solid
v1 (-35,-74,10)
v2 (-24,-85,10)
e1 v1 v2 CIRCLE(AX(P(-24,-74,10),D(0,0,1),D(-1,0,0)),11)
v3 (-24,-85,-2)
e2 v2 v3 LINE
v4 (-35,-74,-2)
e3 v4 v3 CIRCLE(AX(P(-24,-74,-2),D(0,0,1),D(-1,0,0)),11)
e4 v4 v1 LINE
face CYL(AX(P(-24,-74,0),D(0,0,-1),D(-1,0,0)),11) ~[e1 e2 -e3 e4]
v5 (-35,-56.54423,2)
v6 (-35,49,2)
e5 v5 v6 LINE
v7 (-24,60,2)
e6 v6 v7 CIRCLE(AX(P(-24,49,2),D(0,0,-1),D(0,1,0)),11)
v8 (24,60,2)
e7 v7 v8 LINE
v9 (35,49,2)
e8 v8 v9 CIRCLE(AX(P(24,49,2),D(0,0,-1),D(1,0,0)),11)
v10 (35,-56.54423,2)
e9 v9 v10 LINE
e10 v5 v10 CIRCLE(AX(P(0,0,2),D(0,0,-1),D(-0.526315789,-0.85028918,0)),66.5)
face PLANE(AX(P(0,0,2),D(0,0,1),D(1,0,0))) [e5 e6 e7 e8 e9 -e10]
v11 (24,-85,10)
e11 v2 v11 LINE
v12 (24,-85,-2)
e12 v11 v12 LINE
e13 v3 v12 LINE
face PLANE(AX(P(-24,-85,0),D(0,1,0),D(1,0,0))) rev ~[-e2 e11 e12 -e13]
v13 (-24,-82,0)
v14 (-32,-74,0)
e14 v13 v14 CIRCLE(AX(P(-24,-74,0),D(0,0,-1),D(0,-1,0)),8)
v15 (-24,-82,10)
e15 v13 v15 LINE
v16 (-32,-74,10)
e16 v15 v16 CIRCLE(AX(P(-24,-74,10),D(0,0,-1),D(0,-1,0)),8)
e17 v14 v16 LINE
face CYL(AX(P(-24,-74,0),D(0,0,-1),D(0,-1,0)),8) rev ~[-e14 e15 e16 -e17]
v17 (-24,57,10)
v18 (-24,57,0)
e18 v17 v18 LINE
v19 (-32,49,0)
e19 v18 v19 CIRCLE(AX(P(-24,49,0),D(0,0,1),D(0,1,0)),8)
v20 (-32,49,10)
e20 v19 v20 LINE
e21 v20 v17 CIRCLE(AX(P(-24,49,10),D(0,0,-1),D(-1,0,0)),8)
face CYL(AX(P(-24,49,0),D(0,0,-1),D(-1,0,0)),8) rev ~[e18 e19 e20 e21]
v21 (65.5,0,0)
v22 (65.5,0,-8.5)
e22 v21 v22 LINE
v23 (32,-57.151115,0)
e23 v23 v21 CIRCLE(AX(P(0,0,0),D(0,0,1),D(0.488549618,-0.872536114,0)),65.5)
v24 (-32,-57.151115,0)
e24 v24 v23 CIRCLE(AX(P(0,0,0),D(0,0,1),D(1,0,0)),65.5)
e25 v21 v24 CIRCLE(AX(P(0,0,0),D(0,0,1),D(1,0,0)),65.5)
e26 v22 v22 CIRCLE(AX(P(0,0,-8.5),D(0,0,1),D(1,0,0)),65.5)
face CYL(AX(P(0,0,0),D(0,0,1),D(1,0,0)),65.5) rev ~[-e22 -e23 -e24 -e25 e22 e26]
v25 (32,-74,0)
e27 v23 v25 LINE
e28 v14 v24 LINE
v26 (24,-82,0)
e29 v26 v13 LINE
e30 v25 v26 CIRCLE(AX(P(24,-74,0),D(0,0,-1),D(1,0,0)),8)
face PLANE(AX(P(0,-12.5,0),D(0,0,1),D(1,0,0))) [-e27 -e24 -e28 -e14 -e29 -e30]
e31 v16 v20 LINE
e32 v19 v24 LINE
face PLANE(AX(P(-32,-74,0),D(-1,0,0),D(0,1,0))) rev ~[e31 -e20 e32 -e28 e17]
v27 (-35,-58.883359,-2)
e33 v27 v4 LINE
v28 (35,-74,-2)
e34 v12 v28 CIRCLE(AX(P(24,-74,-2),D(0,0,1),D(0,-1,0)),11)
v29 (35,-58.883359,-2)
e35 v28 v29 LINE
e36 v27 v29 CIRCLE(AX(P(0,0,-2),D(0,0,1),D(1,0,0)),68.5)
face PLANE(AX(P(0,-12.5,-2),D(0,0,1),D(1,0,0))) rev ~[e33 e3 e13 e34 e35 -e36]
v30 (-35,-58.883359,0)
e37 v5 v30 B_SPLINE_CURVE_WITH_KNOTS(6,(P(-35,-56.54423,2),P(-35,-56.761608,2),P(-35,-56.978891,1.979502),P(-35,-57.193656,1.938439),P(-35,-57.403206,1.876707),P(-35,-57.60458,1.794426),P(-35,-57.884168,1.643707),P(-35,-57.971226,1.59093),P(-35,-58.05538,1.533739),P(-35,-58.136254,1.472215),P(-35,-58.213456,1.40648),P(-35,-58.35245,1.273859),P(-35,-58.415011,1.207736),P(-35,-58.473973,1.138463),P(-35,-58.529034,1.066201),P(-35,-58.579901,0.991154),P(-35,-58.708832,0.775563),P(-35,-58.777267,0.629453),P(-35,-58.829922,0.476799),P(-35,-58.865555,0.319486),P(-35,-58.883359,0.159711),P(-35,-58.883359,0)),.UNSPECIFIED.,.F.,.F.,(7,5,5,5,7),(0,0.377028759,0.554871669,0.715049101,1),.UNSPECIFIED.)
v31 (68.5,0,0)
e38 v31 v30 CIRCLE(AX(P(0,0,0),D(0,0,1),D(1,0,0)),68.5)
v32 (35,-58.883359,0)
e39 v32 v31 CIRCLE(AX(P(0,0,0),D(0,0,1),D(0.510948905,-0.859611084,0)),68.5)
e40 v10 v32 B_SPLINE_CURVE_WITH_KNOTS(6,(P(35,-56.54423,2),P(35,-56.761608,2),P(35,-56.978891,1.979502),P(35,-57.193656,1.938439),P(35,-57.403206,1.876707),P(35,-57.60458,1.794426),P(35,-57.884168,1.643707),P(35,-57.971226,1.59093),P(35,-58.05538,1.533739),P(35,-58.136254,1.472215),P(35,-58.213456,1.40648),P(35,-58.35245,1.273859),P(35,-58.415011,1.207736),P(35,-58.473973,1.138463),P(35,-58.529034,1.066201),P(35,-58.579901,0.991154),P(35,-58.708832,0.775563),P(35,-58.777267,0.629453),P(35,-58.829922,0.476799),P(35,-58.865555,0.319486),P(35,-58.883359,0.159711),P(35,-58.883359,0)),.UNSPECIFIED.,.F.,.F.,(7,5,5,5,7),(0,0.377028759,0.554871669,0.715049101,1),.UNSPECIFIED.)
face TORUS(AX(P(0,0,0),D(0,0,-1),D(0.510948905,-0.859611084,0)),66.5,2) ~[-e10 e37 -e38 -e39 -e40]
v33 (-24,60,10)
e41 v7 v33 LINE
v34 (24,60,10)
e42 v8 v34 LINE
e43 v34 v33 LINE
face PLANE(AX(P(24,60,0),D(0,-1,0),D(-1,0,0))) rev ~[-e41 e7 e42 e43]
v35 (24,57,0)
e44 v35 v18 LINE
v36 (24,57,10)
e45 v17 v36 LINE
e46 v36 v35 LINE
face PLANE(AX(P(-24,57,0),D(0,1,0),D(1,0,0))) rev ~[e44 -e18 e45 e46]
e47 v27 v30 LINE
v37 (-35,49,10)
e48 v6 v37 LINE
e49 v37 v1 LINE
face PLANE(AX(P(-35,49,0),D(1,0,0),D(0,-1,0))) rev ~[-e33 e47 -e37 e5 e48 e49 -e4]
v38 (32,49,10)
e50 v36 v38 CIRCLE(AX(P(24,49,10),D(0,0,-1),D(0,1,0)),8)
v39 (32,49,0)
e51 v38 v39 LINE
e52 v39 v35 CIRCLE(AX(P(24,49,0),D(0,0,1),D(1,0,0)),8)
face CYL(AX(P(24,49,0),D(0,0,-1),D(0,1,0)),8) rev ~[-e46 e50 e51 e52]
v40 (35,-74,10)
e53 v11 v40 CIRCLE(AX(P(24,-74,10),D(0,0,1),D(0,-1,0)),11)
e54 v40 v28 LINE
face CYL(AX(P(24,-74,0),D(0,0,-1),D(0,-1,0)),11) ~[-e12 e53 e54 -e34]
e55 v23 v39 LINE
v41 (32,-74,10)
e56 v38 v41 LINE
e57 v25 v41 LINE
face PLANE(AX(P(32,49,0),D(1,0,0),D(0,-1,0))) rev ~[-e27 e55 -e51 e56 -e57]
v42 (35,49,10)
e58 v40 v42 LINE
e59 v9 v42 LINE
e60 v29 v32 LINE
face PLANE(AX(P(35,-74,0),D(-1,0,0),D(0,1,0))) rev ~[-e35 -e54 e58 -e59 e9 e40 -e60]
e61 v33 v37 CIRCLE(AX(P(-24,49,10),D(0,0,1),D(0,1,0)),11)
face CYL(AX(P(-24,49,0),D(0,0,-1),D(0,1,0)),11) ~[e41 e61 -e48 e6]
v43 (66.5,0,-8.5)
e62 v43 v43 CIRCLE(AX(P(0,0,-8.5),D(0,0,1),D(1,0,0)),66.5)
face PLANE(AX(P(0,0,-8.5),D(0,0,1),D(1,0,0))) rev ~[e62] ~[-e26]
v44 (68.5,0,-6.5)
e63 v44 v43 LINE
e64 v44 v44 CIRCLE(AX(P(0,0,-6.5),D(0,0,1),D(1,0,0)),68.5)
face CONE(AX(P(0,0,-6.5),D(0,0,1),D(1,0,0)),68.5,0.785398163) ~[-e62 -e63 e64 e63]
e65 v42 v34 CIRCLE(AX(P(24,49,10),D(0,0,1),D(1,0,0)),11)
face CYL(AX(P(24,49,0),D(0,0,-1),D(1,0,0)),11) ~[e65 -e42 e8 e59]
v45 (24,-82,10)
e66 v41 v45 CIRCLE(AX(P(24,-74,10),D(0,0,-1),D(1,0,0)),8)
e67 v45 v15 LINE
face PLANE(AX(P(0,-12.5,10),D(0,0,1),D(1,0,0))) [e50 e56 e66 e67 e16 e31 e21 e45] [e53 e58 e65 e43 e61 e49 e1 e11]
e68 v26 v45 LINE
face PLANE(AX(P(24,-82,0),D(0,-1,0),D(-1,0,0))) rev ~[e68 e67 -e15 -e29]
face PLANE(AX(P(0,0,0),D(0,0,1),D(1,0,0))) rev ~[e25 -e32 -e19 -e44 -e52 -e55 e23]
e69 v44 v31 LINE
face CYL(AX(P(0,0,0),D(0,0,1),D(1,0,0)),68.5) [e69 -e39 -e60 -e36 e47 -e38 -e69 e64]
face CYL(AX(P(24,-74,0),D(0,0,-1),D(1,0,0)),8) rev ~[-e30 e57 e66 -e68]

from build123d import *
from build123d import SkipClean  # not in build123d's __all__

# Parameters (mm, degrees)
F0_R     = 68.5
F0_R_2   = 65.5
F1_DEPTH = 2
F2_DEPTH = 8.5
F3_SIZE  = 2
F5_DEPTH = 2
F6_DEPTH = 3
F7_DEPTH = 10
F8_DEPTH = 25
F9_R     = 2


# Not quite as in the source:
# - after a boolean that leaves OpenCascade's solid faulty, fix() repairs it


with BuildPart() as f1:
    # F0 (on Top) → F1 (new body)
    with BuildSketch(Plane.XY):
        Circle(F0_R)
        Circle(F0_R_2, mode=Mode.SUBTRACT)
        Circle(F0_R_2)
    extrude(amount=F1_DEPTH)

    # F0 (on Top) → F2 (join)
    with BuildSketch(Plane.XY):
        Circle(F0_R)
        Circle(F0_R_2, mode=Mode.SUBTRACT)
    extrude(amount=-F2_DEPTH)

    # F3
    f3_edges = [f1.edges().sort_by_distance(p)[0] for p in [
        (-68.5, 0, -8.5),
    ]]
    chamfer(f3_edges, length=F3_SIZE)

    # F4 (on Top) → F5 (join)
    with BuildSketch(Plane.XY):
        with BuildLine():
            Line((35, -74), (35, 49))
            ThreePointArc((35, 49), (31.7781745931, 56.7781745931), (24, 60))
            Line((24, 60), (-24, 60))
            ThreePointArc((-24, 60), (-31.7781745931, 56.7781745931), (-35, 49))
            Line((-35, 49), (-35, -74))
            ThreePointArc((-35, -74), (-31.7781745931, -81.7781745931), (-24, -85))
            Line((-24, -85), (24, -85))
            ThreePointArc((24, -85), (31.7781745931, -81.7781745931), (35, -74))
        make_face()
        with BuildLine():
            ThreePointArc((-32, 49), (-29.6568542495, 54.6568542495), (-24, 57))
            Line((-24, 57), (0, 57))
            Line((0, 57), (24, 57))
            ThreePointArc((24, 57), (29.6568542495, 54.6568542495), (32, 49))
            Line((32, 49), (32, -74))
            ThreePointArc((32, -74), (29.6568542495, -79.6568542495), (24, -82))
            Line((24, -82), (-24, -82))
            ThreePointArc((-24, -82), (-29.6568542495, -79.6568542495), (-32, -74))
            Line((-32, -74), (-32, 49))
        make_face(mode=Mode.SUBTRACT)
        with BuildLine():
            Line((0, 57), (-24, 57))
            ThreePointArc((-24, 57), (-29.6568542495, 54.6568542495), (-32, 49))
            Line((-32, 49), (-32, -74))
            ThreePointArc((-32, -74), (-29.6568542495, -79.6568542495), (-24, -82))
            Line((-24, -82), (24, -82))
            ThreePointArc((24, -82), (29.6568542495, -79.6568542495), (32, -74))
            Line((32, -74), (32, 49))
            ThreePointArc((32, 49), (29.6568542495, 54.6568542495), (24, 57))
            Line((24, 57), (0, 57))
        make_face()
    extrude(amount=-F5_DEPTH)

    # F4 (on Top) → F6 (cut)
    with BuildSketch(Plane.XY):
        with BuildLine():
            Line((0, 57), (-24, 57))
            ThreePointArc((-24, 57), (-29.6568542495, 54.6568542495), (-32, 49))
            Line((-32, 49), (-32, -74))
            ThreePointArc((-32, -74), (-29.6568542495, -79.6568542495), (-24, -82))
            Line((-24, -82), (24, -82))
            ThreePointArc((24, -82), (29.6568542495, -79.6568542495), (32, -74))
            Line((32, -74), (32, 49))
            ThreePointArc((32, 49), (29.6568542495, 54.6568542495), (24, 57))
            Line((24, 57), (0, 57))
        make_face()
    extrude(amount=F6_DEPTH, mode=Mode.SUBTRACT)

    # F4 (on Top) → F7 (join)
    with BuildSketch(Plane.XY):
        with BuildLine():
            Line((35, -74), (35, 49))
            ThreePointArc((35, 49), (31.7781745931, 56.7781745931), (24, 60))
            Line((24, 60), (-24, 60))
            ThreePointArc((-24, 60), (-31.7781745931, 56.7781745931), (-35, 49))
            Line((-35, 49), (-35, -74))
            ThreePointArc((-35, -74), (-31.7781745931, -81.7781745931), (-24, -85))
            Line((-24, -85), (24, -85))
            ThreePointArc((24, -85), (31.7781745931, -81.7781745931), (35, -74))
        make_face()
        with BuildLine():
            ThreePointArc((-32, 49), (-29.6568542495, 54.6568542495), (-24, 57))
            Line((-24, 57), (0, 57))
            Line((0, 57), (24, 57))
            ThreePointArc((24, 57), (29.6568542495, 54.6568542495), (32, 49))
            Line((32, 49), (32, -74))
            ThreePointArc((32, -74), (29.6568542495, -79.6568542495), (24, -82))
            Line((24, -82), (-24, -82))
            ThreePointArc((-24, -82), (-29.6568542495, -79.6568542495), (-32, -74))
            Line((-32, -74), (-32, 49))
        make_face(mode=Mode.SUBTRACT)
    with SkipClean():  # cleaning this boolean's faces spoils the solid; the shape is the same uncleaned
        extrude(amount=F7_DEPTH)

    # F0 (on Top) → F8 (cut)
    with BuildSketch(Plane.XY):
        Circle(F0_R_2)
    extrude(amount=-F8_DEPTH, mode=Mode.SUBTRACT)

    add(f1.part.fix(), mode=Mode.REPLACE)

    # F9
    f9_edges = [f1.edges().sort_by_distance(p)[0] for p in [
        (-33.872924, 59.538853, 2),
    ]]
    fillet(f9_edges, radius=F9_R)


solid = f1.part
